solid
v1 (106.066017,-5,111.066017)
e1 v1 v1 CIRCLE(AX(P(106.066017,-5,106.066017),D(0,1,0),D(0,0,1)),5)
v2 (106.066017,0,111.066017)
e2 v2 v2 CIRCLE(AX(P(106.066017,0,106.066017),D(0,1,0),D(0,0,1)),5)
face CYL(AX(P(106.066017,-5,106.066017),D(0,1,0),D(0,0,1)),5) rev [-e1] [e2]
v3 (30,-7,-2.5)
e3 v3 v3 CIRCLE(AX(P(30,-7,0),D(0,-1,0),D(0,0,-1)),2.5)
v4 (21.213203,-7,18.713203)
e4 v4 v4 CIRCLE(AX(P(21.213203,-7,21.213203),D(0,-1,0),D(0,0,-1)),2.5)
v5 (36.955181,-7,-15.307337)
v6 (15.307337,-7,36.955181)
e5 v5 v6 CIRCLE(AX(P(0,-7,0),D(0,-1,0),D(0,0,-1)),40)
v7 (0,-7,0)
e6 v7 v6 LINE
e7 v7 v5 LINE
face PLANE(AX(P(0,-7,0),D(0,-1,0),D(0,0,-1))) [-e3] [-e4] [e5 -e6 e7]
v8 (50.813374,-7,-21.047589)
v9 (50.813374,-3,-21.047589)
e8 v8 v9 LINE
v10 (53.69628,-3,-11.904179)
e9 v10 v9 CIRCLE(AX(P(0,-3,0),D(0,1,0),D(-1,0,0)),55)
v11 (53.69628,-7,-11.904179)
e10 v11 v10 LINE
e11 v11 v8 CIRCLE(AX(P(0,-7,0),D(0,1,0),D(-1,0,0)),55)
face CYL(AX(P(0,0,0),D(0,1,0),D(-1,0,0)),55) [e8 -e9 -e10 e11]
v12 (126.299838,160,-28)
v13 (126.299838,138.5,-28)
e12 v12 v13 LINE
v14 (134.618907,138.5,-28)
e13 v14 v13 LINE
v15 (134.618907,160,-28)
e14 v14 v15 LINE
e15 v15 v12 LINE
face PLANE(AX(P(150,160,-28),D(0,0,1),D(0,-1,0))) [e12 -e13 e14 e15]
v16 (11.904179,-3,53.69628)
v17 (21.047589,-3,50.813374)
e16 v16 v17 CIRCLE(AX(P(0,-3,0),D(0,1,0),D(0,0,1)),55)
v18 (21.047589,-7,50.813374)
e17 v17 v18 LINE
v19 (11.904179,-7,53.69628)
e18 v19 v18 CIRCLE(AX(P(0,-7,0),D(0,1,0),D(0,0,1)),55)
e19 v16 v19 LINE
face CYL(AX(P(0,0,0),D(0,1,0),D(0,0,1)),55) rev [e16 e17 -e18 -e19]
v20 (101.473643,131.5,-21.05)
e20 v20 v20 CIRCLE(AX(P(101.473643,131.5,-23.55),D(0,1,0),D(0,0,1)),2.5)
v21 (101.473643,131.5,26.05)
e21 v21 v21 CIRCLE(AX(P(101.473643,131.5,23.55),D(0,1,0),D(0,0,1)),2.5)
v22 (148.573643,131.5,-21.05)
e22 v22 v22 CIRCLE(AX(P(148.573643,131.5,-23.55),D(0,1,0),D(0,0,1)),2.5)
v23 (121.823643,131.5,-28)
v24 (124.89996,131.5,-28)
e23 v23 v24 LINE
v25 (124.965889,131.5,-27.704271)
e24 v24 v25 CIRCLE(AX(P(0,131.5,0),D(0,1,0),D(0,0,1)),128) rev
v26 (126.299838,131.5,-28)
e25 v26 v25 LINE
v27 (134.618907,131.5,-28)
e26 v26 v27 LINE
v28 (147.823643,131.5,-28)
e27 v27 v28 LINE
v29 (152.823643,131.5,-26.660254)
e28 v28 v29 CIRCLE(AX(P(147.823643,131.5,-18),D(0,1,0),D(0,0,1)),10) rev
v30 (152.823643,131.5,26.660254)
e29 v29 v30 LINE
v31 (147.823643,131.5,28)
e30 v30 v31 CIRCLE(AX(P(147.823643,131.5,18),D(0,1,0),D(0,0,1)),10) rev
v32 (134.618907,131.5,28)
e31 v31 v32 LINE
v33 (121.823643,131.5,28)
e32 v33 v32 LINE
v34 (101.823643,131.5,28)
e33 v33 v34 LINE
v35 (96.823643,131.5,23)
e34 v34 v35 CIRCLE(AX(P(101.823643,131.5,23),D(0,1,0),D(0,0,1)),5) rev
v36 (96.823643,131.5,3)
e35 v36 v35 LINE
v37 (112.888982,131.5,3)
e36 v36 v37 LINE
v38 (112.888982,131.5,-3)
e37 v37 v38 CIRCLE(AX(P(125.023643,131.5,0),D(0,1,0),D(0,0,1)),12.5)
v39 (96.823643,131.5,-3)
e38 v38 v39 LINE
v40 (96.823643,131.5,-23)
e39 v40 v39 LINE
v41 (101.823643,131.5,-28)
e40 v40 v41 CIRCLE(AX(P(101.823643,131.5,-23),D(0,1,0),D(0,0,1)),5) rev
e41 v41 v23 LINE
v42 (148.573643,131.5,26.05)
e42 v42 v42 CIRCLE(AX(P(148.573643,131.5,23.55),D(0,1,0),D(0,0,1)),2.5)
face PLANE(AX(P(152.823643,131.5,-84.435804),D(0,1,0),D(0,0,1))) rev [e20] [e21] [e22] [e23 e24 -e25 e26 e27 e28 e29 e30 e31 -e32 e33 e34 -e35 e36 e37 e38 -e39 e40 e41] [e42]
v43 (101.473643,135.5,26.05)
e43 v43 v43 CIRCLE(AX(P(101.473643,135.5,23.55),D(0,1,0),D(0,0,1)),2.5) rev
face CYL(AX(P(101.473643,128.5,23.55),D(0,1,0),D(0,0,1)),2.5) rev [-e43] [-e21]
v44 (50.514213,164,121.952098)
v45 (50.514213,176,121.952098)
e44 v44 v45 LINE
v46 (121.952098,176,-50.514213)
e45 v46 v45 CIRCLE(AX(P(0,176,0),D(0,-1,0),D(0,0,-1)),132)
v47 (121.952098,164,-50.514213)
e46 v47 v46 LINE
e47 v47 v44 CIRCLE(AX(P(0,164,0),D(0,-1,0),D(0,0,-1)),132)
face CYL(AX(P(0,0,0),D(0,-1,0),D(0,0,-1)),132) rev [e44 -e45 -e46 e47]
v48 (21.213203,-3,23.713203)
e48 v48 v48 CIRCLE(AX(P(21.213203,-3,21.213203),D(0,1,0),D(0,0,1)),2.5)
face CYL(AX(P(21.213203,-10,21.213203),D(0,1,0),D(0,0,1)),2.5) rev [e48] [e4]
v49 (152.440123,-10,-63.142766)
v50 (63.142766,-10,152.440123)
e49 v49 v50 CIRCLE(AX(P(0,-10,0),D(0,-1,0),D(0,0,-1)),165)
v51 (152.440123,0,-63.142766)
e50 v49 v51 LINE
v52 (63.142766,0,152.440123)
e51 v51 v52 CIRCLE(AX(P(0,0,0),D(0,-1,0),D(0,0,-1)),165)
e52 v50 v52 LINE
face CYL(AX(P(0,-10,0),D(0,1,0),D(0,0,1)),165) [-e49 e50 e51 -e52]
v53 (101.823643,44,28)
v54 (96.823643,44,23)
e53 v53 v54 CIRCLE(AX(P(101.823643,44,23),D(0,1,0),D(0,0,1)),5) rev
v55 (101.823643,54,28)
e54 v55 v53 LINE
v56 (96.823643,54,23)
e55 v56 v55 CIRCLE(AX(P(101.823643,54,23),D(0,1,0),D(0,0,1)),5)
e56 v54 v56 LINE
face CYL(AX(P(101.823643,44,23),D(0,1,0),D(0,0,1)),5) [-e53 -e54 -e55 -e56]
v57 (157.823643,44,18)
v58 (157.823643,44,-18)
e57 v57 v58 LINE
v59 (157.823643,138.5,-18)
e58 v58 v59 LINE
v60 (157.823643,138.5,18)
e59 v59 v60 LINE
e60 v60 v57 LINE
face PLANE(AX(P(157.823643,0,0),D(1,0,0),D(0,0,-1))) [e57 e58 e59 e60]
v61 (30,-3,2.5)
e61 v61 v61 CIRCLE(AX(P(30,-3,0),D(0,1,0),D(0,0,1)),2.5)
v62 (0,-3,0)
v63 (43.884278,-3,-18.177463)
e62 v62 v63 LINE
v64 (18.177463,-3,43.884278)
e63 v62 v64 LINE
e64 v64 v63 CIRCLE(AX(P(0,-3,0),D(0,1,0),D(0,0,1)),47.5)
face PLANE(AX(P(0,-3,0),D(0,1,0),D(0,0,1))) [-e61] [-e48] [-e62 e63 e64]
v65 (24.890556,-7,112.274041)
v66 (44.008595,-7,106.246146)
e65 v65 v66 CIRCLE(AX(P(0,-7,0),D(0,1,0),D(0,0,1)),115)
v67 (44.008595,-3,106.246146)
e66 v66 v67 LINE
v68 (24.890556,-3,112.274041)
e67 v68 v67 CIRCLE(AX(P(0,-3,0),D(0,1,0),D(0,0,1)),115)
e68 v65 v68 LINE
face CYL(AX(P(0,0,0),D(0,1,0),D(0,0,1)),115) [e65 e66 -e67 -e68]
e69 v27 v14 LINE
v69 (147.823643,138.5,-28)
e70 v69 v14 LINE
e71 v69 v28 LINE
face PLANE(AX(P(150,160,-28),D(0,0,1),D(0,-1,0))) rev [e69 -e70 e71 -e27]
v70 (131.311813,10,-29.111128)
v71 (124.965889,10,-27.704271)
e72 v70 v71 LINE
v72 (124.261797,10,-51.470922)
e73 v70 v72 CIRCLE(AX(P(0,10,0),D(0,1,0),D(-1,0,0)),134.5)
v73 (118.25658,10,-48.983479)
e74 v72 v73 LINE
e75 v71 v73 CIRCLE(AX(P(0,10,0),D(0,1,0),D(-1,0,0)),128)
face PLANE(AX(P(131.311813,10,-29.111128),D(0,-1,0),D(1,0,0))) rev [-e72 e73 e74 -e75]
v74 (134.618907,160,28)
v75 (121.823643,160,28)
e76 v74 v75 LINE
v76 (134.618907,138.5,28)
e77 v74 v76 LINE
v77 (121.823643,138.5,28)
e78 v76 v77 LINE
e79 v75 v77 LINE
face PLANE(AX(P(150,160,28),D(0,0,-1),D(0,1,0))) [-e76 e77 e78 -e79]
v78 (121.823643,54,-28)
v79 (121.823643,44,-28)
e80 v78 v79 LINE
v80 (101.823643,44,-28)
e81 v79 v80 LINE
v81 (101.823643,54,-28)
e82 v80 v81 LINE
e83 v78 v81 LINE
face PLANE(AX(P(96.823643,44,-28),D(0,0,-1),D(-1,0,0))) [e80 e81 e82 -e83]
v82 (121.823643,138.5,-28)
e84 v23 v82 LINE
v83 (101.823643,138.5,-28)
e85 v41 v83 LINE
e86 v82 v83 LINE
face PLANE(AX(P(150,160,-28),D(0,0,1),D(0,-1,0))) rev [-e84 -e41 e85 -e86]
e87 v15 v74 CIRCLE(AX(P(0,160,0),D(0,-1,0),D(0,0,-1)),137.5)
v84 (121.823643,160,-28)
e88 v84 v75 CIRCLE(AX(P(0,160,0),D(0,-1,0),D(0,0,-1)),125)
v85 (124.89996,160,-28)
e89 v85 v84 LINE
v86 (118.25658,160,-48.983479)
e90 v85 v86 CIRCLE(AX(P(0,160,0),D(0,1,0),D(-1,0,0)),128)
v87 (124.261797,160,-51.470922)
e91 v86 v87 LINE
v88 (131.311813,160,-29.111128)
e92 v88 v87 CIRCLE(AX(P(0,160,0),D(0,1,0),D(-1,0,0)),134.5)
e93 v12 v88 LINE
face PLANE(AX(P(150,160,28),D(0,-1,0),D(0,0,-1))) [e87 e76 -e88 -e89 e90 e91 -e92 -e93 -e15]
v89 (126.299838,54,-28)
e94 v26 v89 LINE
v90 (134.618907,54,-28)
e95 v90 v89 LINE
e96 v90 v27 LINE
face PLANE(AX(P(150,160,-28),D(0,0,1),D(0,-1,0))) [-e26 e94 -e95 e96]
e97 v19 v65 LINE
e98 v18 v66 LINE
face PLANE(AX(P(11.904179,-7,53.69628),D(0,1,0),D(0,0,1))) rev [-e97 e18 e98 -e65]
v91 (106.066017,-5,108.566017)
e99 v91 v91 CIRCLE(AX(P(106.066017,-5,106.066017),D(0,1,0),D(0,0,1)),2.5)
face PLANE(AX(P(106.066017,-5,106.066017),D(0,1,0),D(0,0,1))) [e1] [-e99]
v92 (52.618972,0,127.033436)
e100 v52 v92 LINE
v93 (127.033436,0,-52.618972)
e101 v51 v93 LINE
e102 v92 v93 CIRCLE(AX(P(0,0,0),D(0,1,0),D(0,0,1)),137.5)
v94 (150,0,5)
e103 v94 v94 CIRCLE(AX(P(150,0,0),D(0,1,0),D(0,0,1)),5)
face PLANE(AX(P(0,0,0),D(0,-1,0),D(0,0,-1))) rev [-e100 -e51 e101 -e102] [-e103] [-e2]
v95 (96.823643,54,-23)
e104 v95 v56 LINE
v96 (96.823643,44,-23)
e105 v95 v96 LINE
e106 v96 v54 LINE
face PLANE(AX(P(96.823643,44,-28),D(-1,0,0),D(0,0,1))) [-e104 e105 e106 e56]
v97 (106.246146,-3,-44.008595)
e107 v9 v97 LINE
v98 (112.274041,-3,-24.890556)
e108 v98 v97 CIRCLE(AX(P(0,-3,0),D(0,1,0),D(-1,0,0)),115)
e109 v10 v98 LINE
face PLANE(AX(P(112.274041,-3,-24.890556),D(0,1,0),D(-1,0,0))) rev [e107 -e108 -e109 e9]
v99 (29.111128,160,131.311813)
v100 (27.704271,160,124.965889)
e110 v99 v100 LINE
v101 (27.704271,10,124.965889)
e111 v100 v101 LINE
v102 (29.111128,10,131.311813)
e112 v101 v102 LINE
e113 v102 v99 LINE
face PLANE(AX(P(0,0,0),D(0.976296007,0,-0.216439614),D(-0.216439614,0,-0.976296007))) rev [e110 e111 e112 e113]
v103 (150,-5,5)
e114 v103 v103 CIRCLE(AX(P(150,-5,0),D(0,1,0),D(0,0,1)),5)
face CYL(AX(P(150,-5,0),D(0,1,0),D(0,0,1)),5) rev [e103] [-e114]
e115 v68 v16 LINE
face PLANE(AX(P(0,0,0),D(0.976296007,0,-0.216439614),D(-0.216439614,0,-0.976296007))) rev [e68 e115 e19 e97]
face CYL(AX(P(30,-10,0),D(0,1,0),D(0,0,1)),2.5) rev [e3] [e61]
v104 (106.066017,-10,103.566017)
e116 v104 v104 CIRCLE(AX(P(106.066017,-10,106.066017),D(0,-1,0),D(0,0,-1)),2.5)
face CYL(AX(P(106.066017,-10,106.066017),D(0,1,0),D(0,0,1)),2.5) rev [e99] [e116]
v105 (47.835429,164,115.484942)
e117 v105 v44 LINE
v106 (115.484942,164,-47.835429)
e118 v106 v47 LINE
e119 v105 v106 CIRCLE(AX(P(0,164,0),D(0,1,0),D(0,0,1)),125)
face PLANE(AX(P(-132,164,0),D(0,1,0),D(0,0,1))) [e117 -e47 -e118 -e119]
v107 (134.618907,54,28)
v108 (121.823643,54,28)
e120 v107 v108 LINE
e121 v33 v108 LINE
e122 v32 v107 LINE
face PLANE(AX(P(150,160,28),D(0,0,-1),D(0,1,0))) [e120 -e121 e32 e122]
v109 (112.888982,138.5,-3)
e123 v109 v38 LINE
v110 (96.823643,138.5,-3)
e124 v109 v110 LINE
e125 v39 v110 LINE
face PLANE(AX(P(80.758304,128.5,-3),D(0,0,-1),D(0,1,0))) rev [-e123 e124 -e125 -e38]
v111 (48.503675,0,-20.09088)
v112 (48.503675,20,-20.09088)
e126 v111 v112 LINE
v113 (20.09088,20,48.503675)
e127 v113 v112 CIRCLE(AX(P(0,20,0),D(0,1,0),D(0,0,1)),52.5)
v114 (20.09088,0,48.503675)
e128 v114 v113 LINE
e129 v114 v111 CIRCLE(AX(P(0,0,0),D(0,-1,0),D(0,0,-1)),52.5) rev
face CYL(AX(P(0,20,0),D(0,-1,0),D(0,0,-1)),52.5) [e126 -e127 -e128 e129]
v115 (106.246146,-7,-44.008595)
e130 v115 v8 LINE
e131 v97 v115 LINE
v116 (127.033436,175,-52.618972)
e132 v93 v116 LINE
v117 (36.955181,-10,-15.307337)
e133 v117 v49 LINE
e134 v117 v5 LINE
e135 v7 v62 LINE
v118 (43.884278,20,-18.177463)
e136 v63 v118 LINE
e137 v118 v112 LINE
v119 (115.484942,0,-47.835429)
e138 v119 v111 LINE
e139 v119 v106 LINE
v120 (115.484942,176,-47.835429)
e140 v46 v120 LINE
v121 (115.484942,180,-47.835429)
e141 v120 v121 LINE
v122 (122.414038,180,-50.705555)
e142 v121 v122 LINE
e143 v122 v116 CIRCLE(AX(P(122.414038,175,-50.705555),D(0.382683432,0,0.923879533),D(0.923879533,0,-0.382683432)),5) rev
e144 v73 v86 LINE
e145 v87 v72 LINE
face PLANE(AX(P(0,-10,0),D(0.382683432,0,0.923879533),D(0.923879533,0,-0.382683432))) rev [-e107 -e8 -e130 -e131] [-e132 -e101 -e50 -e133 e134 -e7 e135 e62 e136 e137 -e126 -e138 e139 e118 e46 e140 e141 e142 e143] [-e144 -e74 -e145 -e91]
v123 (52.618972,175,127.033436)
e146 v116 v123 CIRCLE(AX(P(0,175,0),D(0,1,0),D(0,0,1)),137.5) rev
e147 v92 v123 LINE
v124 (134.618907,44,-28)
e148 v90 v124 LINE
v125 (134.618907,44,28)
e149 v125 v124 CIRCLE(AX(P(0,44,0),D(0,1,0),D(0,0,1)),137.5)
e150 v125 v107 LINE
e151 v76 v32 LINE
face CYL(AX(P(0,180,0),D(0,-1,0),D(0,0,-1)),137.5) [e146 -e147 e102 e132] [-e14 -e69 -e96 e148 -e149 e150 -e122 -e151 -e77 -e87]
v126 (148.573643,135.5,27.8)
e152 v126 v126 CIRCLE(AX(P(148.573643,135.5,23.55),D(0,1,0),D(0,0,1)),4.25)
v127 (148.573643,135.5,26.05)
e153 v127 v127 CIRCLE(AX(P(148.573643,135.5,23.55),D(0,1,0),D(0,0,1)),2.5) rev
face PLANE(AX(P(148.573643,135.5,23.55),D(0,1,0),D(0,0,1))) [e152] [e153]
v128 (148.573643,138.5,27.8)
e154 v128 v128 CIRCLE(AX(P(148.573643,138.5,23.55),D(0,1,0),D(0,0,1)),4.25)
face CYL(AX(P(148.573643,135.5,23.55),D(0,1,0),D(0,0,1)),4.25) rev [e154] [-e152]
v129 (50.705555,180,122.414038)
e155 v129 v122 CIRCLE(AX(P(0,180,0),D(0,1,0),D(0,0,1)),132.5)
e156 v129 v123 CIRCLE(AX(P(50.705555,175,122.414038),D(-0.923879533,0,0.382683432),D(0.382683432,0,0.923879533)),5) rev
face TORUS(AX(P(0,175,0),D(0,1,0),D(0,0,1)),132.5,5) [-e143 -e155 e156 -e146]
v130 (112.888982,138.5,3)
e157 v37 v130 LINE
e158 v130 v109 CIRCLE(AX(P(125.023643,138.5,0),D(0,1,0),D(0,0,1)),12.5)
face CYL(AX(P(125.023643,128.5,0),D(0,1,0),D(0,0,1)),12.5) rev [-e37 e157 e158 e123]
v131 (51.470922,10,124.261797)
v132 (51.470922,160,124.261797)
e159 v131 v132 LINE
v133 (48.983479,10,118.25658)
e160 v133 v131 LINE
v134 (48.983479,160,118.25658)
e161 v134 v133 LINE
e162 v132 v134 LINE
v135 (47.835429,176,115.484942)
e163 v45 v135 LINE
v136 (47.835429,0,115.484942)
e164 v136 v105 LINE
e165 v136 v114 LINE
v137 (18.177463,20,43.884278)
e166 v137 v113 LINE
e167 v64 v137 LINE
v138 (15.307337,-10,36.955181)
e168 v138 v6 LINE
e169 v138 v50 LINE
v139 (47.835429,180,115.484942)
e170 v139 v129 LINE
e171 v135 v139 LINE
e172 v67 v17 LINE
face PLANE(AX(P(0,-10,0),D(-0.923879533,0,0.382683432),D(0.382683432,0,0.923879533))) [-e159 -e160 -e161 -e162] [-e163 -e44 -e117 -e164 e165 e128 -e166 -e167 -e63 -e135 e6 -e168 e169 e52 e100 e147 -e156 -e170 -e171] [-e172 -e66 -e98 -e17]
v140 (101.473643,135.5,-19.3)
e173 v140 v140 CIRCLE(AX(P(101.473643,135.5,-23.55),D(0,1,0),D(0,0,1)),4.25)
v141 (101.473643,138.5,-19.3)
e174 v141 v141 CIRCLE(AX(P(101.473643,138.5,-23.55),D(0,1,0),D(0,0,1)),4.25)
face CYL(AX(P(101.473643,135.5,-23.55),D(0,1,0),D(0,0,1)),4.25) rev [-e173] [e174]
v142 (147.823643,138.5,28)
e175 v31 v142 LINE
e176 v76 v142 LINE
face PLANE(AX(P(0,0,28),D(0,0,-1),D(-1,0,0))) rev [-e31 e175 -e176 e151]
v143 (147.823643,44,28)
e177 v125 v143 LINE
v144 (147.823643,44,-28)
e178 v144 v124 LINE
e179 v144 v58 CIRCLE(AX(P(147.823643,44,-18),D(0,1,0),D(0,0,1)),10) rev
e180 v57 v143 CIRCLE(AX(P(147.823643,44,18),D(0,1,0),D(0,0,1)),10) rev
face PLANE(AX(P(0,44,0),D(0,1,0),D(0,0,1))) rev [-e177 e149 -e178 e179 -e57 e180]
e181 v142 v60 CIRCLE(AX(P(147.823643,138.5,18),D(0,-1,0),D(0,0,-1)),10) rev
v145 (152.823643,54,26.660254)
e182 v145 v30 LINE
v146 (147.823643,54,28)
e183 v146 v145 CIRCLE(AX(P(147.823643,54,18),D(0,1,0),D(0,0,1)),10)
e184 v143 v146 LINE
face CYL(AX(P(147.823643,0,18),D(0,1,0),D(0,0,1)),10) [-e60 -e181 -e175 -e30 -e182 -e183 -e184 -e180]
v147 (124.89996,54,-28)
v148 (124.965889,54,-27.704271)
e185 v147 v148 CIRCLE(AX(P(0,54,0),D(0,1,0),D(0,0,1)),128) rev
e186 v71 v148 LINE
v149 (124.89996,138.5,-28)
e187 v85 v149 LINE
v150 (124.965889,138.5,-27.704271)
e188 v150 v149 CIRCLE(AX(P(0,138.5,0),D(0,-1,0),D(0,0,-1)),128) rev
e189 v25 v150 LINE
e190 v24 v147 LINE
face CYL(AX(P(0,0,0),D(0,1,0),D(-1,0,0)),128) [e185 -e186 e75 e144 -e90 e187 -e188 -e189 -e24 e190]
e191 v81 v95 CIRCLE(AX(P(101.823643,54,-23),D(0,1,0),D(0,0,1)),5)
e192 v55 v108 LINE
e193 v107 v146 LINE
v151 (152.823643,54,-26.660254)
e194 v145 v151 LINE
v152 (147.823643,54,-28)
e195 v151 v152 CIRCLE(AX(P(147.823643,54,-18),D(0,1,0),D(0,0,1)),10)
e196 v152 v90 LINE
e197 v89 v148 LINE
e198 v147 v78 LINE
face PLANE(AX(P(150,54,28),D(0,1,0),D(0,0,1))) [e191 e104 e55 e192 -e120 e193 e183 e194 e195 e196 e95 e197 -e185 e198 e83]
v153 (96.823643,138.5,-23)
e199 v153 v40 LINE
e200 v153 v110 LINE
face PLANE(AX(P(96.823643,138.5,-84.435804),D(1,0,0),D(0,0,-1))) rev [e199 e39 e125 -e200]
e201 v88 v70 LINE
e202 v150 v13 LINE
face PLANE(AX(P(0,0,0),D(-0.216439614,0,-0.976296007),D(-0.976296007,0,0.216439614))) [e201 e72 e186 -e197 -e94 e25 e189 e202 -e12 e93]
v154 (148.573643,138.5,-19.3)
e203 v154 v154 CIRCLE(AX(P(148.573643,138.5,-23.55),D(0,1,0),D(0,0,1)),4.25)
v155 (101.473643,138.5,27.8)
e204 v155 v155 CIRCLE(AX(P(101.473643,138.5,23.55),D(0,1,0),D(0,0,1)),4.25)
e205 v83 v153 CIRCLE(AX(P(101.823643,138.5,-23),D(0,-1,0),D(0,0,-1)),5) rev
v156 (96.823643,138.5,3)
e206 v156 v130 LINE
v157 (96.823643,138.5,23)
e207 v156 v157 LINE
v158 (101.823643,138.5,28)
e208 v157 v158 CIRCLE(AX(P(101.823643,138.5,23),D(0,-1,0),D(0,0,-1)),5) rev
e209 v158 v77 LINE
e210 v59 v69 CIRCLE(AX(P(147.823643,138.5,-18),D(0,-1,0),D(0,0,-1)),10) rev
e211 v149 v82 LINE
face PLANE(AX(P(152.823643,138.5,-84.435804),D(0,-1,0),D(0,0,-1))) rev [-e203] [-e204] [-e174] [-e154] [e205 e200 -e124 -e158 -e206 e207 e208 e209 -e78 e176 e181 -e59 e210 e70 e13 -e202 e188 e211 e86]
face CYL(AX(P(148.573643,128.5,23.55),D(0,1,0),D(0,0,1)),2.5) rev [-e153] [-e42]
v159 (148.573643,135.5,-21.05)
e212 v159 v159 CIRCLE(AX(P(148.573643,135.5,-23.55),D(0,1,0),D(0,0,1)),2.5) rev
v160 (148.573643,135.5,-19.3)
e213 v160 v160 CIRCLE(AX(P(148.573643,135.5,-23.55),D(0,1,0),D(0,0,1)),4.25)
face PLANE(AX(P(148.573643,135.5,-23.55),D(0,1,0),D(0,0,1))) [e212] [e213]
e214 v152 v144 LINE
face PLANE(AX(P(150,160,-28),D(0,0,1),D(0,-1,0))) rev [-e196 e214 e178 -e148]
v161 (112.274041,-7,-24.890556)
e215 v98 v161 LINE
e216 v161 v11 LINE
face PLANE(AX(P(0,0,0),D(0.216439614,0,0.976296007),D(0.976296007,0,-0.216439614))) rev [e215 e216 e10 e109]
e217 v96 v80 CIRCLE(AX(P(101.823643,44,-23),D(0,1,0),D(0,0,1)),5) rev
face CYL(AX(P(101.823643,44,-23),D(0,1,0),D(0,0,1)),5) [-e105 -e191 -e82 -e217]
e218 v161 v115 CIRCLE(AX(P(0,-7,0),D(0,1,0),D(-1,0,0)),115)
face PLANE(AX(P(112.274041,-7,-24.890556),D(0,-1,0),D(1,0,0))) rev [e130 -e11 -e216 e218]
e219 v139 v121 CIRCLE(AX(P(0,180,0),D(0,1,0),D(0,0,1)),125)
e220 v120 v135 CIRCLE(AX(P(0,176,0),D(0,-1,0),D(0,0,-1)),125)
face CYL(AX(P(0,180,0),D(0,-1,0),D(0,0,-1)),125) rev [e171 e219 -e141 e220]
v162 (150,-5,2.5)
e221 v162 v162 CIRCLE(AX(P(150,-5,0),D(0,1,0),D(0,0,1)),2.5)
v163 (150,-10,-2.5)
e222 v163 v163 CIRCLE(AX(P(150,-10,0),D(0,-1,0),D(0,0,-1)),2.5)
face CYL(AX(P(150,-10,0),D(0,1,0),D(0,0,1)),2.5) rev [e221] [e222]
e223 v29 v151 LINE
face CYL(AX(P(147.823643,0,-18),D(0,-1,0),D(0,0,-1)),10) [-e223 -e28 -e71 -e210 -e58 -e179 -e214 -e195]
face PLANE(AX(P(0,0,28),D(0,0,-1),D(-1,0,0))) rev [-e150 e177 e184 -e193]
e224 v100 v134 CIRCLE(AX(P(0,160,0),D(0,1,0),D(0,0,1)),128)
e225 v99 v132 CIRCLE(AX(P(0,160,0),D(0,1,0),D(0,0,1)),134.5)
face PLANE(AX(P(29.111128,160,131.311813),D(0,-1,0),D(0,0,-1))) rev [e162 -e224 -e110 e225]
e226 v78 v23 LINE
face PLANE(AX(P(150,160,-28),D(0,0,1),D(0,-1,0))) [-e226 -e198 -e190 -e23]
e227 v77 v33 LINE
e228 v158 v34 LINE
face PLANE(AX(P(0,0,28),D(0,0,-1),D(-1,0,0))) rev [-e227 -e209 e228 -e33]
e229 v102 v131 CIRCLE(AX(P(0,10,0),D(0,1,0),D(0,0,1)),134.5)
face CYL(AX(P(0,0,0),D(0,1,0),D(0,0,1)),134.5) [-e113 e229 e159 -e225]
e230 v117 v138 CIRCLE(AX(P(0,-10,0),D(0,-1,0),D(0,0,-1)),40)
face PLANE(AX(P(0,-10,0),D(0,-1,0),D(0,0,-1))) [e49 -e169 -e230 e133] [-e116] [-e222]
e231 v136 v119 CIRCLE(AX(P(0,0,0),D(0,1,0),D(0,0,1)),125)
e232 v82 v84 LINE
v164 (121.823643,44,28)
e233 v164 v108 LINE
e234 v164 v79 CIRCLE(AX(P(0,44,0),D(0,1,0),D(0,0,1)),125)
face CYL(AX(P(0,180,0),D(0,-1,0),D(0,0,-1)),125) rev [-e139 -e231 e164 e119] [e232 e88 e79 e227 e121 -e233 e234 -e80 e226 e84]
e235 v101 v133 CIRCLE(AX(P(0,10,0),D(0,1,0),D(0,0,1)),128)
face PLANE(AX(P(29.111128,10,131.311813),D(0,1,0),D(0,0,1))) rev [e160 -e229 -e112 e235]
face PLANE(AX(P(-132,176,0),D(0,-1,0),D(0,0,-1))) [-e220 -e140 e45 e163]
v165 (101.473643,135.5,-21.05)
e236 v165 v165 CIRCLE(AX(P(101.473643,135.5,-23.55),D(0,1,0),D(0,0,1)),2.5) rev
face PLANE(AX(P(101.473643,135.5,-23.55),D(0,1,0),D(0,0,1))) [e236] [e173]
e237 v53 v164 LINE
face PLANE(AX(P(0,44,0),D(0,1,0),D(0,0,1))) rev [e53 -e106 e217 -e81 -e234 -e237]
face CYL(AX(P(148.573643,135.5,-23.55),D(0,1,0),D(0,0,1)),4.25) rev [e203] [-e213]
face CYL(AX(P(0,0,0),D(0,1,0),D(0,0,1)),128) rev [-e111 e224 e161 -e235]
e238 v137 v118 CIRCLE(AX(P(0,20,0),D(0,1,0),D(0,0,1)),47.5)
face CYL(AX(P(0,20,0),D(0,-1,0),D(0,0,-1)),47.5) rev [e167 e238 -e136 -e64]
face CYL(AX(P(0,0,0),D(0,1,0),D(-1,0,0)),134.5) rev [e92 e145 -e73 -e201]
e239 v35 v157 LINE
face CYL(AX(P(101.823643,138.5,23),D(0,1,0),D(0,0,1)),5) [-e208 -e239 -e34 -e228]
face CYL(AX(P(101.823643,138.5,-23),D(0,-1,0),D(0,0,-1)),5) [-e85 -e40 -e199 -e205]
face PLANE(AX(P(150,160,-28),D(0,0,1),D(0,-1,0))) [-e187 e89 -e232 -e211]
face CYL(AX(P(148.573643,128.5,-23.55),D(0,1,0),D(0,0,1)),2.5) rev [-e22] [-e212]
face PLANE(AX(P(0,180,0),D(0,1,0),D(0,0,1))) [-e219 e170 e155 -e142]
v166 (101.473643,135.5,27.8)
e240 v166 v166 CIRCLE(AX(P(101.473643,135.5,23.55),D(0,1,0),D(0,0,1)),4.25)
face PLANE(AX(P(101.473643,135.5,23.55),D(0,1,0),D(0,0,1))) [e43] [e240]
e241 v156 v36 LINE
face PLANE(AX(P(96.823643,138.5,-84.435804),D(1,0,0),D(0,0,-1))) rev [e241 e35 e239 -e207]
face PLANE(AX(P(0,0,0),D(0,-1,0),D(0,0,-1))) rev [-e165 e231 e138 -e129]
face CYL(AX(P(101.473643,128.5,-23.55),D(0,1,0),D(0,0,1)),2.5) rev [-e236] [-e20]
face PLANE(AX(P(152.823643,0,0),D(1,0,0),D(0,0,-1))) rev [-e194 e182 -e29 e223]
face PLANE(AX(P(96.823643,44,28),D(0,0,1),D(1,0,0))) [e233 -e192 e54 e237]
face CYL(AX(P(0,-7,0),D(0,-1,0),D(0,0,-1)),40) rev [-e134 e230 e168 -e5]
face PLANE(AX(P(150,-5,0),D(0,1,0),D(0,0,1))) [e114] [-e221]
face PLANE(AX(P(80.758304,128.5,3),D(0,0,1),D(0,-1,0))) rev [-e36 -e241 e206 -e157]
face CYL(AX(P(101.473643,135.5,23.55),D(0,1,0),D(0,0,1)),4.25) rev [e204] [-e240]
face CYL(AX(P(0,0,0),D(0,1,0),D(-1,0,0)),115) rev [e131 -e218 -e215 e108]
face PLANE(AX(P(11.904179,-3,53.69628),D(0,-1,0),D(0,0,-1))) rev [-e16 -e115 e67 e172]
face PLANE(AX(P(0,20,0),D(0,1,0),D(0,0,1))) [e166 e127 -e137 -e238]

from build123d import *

# Parameters (mm, degrees)
SKETCH1_R           = 137.5
SKETCH1_R_2         = 125
BOSS_EXTRUDE1_DEPTH = 180
SKETCH2_R           = 165
SKETCH2_R_2         = 2.5
BOSS_EXTRUDE2_DEPTH = 10
SKETCH3_R           = 52.5
SKETCH3_R_2         = 47.5
BOSS_EXTRUDE3_DEPTH = 20
SKETCH4_W           = 56
SKETCH4_H           = 106
CUT_EXTRUDE4_DEPTH  = 150
SKETCH5_W           = 56
SKETCH5_H           = 7
BOSS_EXTRUDE4_DEPTH = 56
SKETCH6_W           = 56
SKETCH6_H           = 56
BOSS_EXTRUDE5_DEPTH = 10
SKETCH7_R           = 2.5
SKETCH7_R_2         = 12.5
CUT_EXTRUDE5_DEPTH  = 10
SKETCH8_W           = 56
SKETCH8_H           = 94.5
BOSS_EXTRUDE6_DEPTH = 5
FILLET1_R           = 10
FILLET2_R           = 5
SKETCH9_W           = 32.130677801
SKETCH9_H           = 6
CUT_EXTRUDE6_DEPTH  = 10
FILLET3_R           = 5
CUT_EXTRUDE7_START  = -3
SKETCH10_R          = 47.5
CUT_EXTRUDE7_DEPTH  = 3
SKETCH11_R          = 5
CUT_EXTRUDE8_DEPTH  = 5
SKETCH13_W          = 14
SKETCH13_H          = 12
CUT_EXTRUDE9_DEPTH  = 301.915270467
SKETCH15_W          = 6.5
SKETCH15_H          = 150
SKETCH15_W_2        = 60
SKETCH15_H_2        = 4
REVOLVE1_ANGLE      = 10
SKETCH16_W          = 6.5
SKETCH16_H          = 150
SKETCH16_W_2        = 60
SKETCH16_H_2        = 4
CUT_REVOLVE2_ANGLE  = 10
SKETCH17_R          = 40
CUT_EXTRUDE10_DEPTH = 3
SKETCH18_R          = 4.25
CUT_EXTRUDE12_DEPTH = 3


with BuildPart() as part:
    # Sketch1 → Boss-Extrude1 (new body)
    with BuildSketch(Plane(origin=(0, 0, 0), x_dir=(1, 0, 0), z_dir=(0, 1, 0))):
        with Locations(Location((0, 0, 0), (0, 0, 90))):
            Circle(SKETCH1_R)
        with Locations(Location((0, 0, 0), (0, 0, 90))):
            Circle(SKETCH1_R_2, mode=Mode.SUBTRACT)
    extrude(amount=BOSS_EXTRUDE1_DEPTH)

    # Sketch2 → Boss-Extrude2 (add)
    with BuildSketch(Plane.XZ):
        with Locations(Location((0, 0, 0), (0, 0, 270))):
            Circle(SKETCH2_R)
        with Locations(Location((0, 150, 0), (0, 0, 270))):
            Circle(SKETCH2_R_2, mode=Mode.SUBTRACT)
        with Locations(Location((0, 30, 0), (0, 0, 270))):
            Circle(SKETCH2_R_2, mode=Mode.SUBTRACT)
        with Locations(Location((106.066017178, 106.066017178, 0), (0, 0, 270))):
            Circle(SKETCH2_R_2, mode=Mode.SUBTRACT)
        with Locations(Location((150, 0, 0), (0, 0, 270))):
            Circle(SKETCH2_R_2, mode=Mode.SUBTRACT)
        with Locations(Location((106.066017178, -106.066017178, 0), (0, 0, 270))):
            Circle(SKETCH2_R_2, mode=Mode.SUBTRACT)
        with Locations(Location((0, -150, 0), (0, 0, 270))):
            Circle(SKETCH2_R_2, mode=Mode.SUBTRACT)
        with Locations(Location((-106.066017178, -106.066017178, 0), (0, 0, 270))):
            Circle(SKETCH2_R_2, mode=Mode.SUBTRACT)
        with Locations(Location((-150, 0, 0), (0, 0, 270))):
            Circle(SKETCH2_R_2, mode=Mode.SUBTRACT)
        with Locations(Location((-106.066017178, 106.066017178, 0), (0, 0, 270))):
            Circle(SKETCH2_R_2, mode=Mode.SUBTRACT)
        with Locations(Location((21.213203436, 21.213203436, 0), (0, 0, 270))):
            Circle(SKETCH2_R_2, mode=Mode.SUBTRACT)
        with Locations(Location((30, 0, 0), (0, 0, 270))):
            Circle(SKETCH2_R_2, mode=Mode.SUBTRACT)
        with Locations(Location((21.213203436, -21.213203436, 0), (0, 0, 270))):
            Circle(SKETCH2_R_2, mode=Mode.SUBTRACT)
        with Locations(Location((0, -30, 0), (0, 0, 270))):
            Circle(SKETCH2_R_2, mode=Mode.SUBTRACT)
        with Locations(Location((-21.213203436, -21.213203436, 0), (0, 0, 270))):
            Circle(SKETCH2_R_2, mode=Mode.SUBTRACT)
        with Locations(Location((-30, 0, 0), (0, 0, 270))):
            Circle(SKETCH2_R_2, mode=Mode.SUBTRACT)
        with Locations(Location((-21.213203436, 21.213203436, 0), (0, 0, 270))):
            Circle(SKETCH2_R_2, mode=Mode.SUBTRACT)
    extrude(amount=BOSS_EXTRUDE2_DEPTH)

    # Sketch3 → Boss-Extrude3 (add)
    with BuildSketch(Plane(origin=(0, 0, 0), x_dir=(1, 0, 0), z_dir=(0, 1, 0))):
        with Locations(Location((0, 0, 0), (0, 0, 90))):
            Circle(SKETCH3_R)
        with Locations(Location((0, 0, 0), (0, 0, 270))):
            Circle(SKETCH3_R_2, mode=Mode.SUBTRACT)
    extrude(amount=BOSS_EXTRUDE3_DEPTH)

    # Sketch4 → Cut-Extrude4 (cut)
    with BuildSketch(Plane(origin=(0, 0, 0), x_dir=(0, 0, -1), z_dir=(1, 0, 0))):
        with Locations((0, 107)):
            Rectangle(SKETCH4_W, SKETCH4_H)
    extrude(amount=CUT_EXTRUDE4_DEPTH, mode=Mode.SUBTRACT)

    # Sketch5 → Boss-Extrude4 (add)
    with BuildSketch(Plane(origin=(0, 0, 28), x_dir=(-1, 0, 0), z_dir=(0, 0, -1))):
        with Locations((-124.823643025, 135)):
            Rectangle(SKETCH5_W, SKETCH5_H)
    extrude(amount=BOSS_EXTRUDE4_DEPTH)

    # Sketch6 → Boss-Extrude5 (add)
    with BuildSketch(Plane(origin=(0, 54, 0), x_dir=(1, 0, 0), z_dir=(0, 1, 0))):
        with Locations((124.823643025, 0)):
            Rectangle(SKETCH6_W, SKETCH6_H)
    extrude(amount=-BOSS_EXTRUDE5_DEPTH)

    # Sketch7 → Cut-Extrude5 (cut)
    with BuildSketch(Plane(origin=(0, 138.5, 0), x_dir=(1, 0, 0), z_dir=(0, 1, 0))):
        with Locations(Location((101.473643025, 23.55, 0), (0, 0, 270))):
            Circle(SKETCH7_R)
        with Locations(Location((148.573643025, 23.55, 0), (0, 0, 270))):
            Circle(SKETCH7_R)
        with Locations(Location((101.473643025, -23.55, 0), (0, 0, 270))):
            Circle(SKETCH7_R)
        with Locations(Location((148.573643025, -23.55, 0), (0, 0, 270))):
            Circle(SKETCH7_R)
        with Locations(Location((125.023643025, 0, 0), (0, 0, 270))):
            Circle(SKETCH7_R_2)
    extrude(amount=-CUT_EXTRUDE5_DEPTH, mode=Mode.SUBTRACT)

    # Sketch8 → Boss-Extrude6 (add)
    with BuildSketch(Plane(origin=(152.823643025, 0, 0), x_dir=(0, 0, -1), z_dir=(1, 0, 0))):
        with Locations((0, 91.25)):
            Rectangle(SKETCH8_W, SKETCH8_H)
    extrude(amount=BOSS_EXTRUDE6_DEPTH)

    # Fillet1
    # the kernel refuses this fillet: 10 mm, written as the material it takes off along each edge
    with BuildSketch(Plane(origin=(157.823643025, 163.5, -28), x_dir=(0, 0, 1), z_dir=(0, -1, 0))) as fillet1_piece_1:
        with BuildLine():
            CenterArc((FILLET1_R, FILLET1_R), FILLET1_R, 180, 90)
            Line((0, FILLET1_R), (0, 0))
            Line((0, 0), (FILLET1_R, 0))
        make_face()
    extrude(amount=144.5, mode=Mode.SUBTRACT)
    with BuildSketch(Plane(origin=(157.823643025, 19, 28), x_dir=(-1, 0, 0), z_dir=(0, 1, 0))) as fillet1_piece_2:
        with BuildLine():
            CenterArc((FILLET1_R, -FILLET1_R), FILLET1_R, 90, 90)
            Line((0, -FILLET1_R), (0, 0))
            Line((0, 0), (FILLET1_R, 0))
        make_face()
    extrude(amount=144.5, mode=Mode.SUBTRACT)

    # Fillet2
    fillet2_edges = [part.edges().sort_by_distance(p)[0] for p in [
        (96.823643025, 49, 28),
        (96.823643025, 49, -28),
        (96.823643025, 135, -28),
        (96.823643025, 135, 28),
    ]]
    fillet(fillet2_edges, radius=FILLET2_R)

    # Sketch9 → Cut-Extrude6 (cut)
    with BuildSketch(Plane(origin=(0, 138.5, 0), x_dir=(1, 0, 0), z_dir=(0, 1, 0))):
        with Locations((96.823643026, 0)):
            Rectangle(SKETCH9_W, SKETCH9_H)
    extrude(amount=-CUT_EXTRUDE6_DEPTH, mode=Mode.SUBTRACT)

    # Fillet3
    fillet3_edges = [part.edges().sort_by_distance(p)[0] for p in [
        (0, 180, 137.5),
    ]]
    fillet(fillet3_edges, radius=FILLET3_R)

    # Sketch10 → Cut-Extrude7 (cut)
    with BuildSketch(Plane(origin=(0, 0, 0), x_dir=(1, 0, 0), z_dir=(0, 1, 0)).offset(CUT_EXTRUDE7_START)):
        with Locations(Location((0, 0, 0), (0, 0, 270))):
            Circle(SKETCH10_R)
    extrude(amount=CUT_EXTRUDE7_DEPTH, mode=Mode.SUBTRACT)

    # Sketch11 → Cut-Extrude8 (cut)
    with BuildSketch(Plane(origin=(0, 0, 0), x_dir=(1, 0, 0), z_dir=(0, 1, 0))):
        with Locations(Location((0, 150, 0), (0, 0, 270))):
            Circle(SKETCH11_R)
        with Locations(Location((106.066017178, 106.066017178, 0), (0, 0, 270))):
            Circle(SKETCH11_R)
        with Locations(Location((150, 0, 0), (0, 0, 270))):
            Circle(SKETCH11_R)
        with Locations(Location((106.066017178, -106.066017178, 0), (0, 0, 270))):
            Circle(SKETCH11_R)
        with Locations(Location((0, -150, 0), (0, 0, 270))):
            Circle(SKETCH11_R)
        with Locations(Location((-106.066017178, -106.066017178, 0), (0, 0, 270))):
            Circle(SKETCH11_R)
        with Locations(Location((-150, 0, 0), (0, 0, 270))):
            Circle(SKETCH11_R)
        with Locations(Location((-106.066017178, 106.066017178, 0), (0, 0, 270))):
            Circle(SKETCH11_R)
    extrude(amount=-CUT_EXTRUDE8_DEPTH, mode=Mode.SUBTRACT)

    # Sketch13 → Cut-Revolve1 (revolve, cut)
    with BuildSketch(Plane.XY, mode=Mode.PRIVATE) as cut_revolve1_sk:
        with Locations((-125, 170)):
            Rectangle(SKETCH13_W, SKETCH13_H)
    revolve(cut_revolve1_sk.sketch.rotate(Axis((0, 0, 0), (0, 1, 0)), 90), axis=Axis((0, 0, 0), (0, 1, 0)), mode=Mode.SUBTRACT)

    # Sketch14 → Cut-Extrude9 (cut, through all)
    with BuildSketch(Plane(origin=(0, 180, 0), x_dir=(1, 0, 0), z_dir=(0, 1, 0))):
        with BuildLine():
            ThreePointArc((-50.705554788, 122.414038058), (50.705554788, 122.414038058), (122.414038058, 50.705554788))
            Line((122.414038058, 50.705554788), (152.440122864, 63.14276634))
            ThreePointArc((152.440122864, 63.14276634), (63.14276634, 152.440122864), (-63.14276634, 152.440122864))
            Line((-63.14276634, 152.440122864), (-50.705554788, 122.414038058))
        make_face()
        with BuildLine():
            ThreePointArc((-47.835429046, 115.484941564), (47.835429046, 115.484941564), (115.484941564, 47.835429046))
            Line((115.484941564, 47.835429046), (122.414038058, 50.705554788))
            ThreePointArc((122.414038058, 50.705554788), (50.705554788, 122.414038058), (-50.705554788, 122.414038058))
            Line((-50.705554788, 122.414038058), (-47.835429046, 115.484941564))
        make_face()
        with BuildLine():
            Line((-47.835429046, 115.484941564), (0, 0))
            Line((0, 0), (115.484941564, 47.835429046))
            ThreePointArc((115.484941564, 47.835429046), (47.835429046, 115.484941564), (-47.835429046, 115.484941564))
        make_face()
        with BuildLine():
            ThreePointArc((-122.414038058, -50.705554788), (-122.414038058, 50.705554788), (-50.705554788, 122.414038058))
            Line((-50.705554788, 122.414038058), (-63.14276634, 152.440122864))
            ThreePointArc((-63.14276634, 152.440122864), (-152.440122864, 63.14276634), (-152.440122864, -63.14276634))
            Line((-152.440122864, -63.14276634), (-122.414038058, -50.705554788))
        make_face()
        with BuildLine():
            ThreePointArc((-115.484941564, -47.835429046), (-115.484941564, 47.835429046), (-47.835429046, 115.484941564))
            Line((-47.835429046, 115.484941564), (-50.705554788, 122.414038058))
            ThreePointArc((-50.705554788, 122.414038058), (-122.414038058, 50.705554788), (-122.414038058, -50.705554788))
            Line((-122.414038058, -50.705554788), (-115.484941564, -47.835429046))
        make_face()
        with BuildLine():
            Line((-115.484941564, -47.835429046), (0, 0))
            Line((0, 0), (-47.835429046, 115.484941564))
            ThreePointArc((-47.835429046, 115.484941564), (-115.484941564, 47.835429046), (-115.484941564, -47.835429046))
        make_face()
        with BuildLine():
            Line((47.835429046, -115.484941564), (0, 0))
            Line((0, 0), (-115.484941564, -47.835429046))
            ThreePointArc((-115.484941564, -47.835429046), (-47.835429046, -115.484941564), (47.835429046, -115.484941564))
        make_face()
        with BuildLine():
            ThreePointArc((47.835429046, -115.484941564), (-47.835429046, -115.484941564), (-115.484941564, -47.835429046))
            Line((-115.484941564, -47.835429046), (-122.414038058, -50.705554788))
            ThreePointArc((-122.414038058, -50.705554788), (-50.705554788, -122.414038058), (50.705554788, -122.414038058))
            Line((50.705554788, -122.414038058), (47.835429046, -115.484941564))
        make_face()
        with BuildLine():
            ThreePointArc((50.705554788, -122.414038058), (-50.705554788, -122.414038058), (-122.414038058, -50.705554788))
            Line((-122.414038058, -50.705554788), (-152.440122864, -63.14276634))
            ThreePointArc((-152.440122864, -63.14276634), (-63.14276634, -152.440122864), (63.14276634, -152.440122864))
            Line((63.14276634, -152.440122864), (50.705554788, -122.414038058))
        make_face()
    extrude(amount=-CUT_EXTRUDE9_DEPTH, mode=Mode.SUBTRACT)

    # Sketch15 → Revolve1 (revolve)
    with BuildSketch(Plane(origin=(0, 0, 0), x_dir=(0.38268343236509106, 0, 0.9238795325112863), z_dir=(-0.9238795325112862, 0, 0.382683432365091))):
        with Locations((131.25, 85)):
            Rectangle(SKETCH15_W, SKETCH15_H)
        with Locations((85, -5)):
            Rectangle(SKETCH15_W_2, SKETCH15_H_2)
    revolve(axis=Axis((0, 0, 0), (0, -1, 0)), revolution_arc=REVOLVE1_ANGLE)

    # Sketch16 → Cut-Revolve2 (revolve, cut)
    with BuildSketch(Plane(origin=(0, 0, 0), x_dir=(-0.9238795325112865, 0, 0.38268343236509034), z_dir=(-0.38268343236509034, 0, -0.9238795325112865))):
        with Locations((-131.25, 85)):
            Rectangle(SKETCH16_W, SKETCH16_H)
        with Locations((-85, -5)):
            Rectangle(SKETCH16_W_2, SKETCH16_H_2)
    revolve(axis=Axis((0, 0, 0), (0, -1, 0)), revolution_arc=CUT_REVOLVE2_ANGLE, mode=Mode.SUBTRACT)

    # Sketch17 → Cut-Extrude10 (cut)
    with BuildSketch(Plane(origin=(0, -10, 0), x_dir=(-1, 0, 0), z_dir=(0, -1, 0))):
        Circle(SKETCH17_R)
    extrude(amount=-CUT_EXTRUDE10_DEPTH, mode=Mode.SUBTRACT)

    # Sketch18 → Cut-Extrude12 (cut)
    with BuildSketch(Plane(origin=(0, 138.5, 0), x_dir=(1, 0, 0), z_dir=(0, 1, 0))):
        with Locations(Location((101.473643025, 23.55, 0), (0, 0, 270))):
            Circle(SKETCH18_R)
        with Locations(Location((148.573643025, 23.55, 0), (0, 0, 270))):
            Circle(SKETCH18_R)
        with Locations(Location((101.473643025, -23.55, 0), (0, 0, 270))):
            Circle(SKETCH18_R)
        with Locations(Location((148.573643025, -23.55, 0), (0, 0, 270))):
            Circle(SKETCH18_R)
    extrude(amount=-CUT_EXTRUDE12_DEPTH, mode=Mode.SUBTRACT)


solid = part.part
